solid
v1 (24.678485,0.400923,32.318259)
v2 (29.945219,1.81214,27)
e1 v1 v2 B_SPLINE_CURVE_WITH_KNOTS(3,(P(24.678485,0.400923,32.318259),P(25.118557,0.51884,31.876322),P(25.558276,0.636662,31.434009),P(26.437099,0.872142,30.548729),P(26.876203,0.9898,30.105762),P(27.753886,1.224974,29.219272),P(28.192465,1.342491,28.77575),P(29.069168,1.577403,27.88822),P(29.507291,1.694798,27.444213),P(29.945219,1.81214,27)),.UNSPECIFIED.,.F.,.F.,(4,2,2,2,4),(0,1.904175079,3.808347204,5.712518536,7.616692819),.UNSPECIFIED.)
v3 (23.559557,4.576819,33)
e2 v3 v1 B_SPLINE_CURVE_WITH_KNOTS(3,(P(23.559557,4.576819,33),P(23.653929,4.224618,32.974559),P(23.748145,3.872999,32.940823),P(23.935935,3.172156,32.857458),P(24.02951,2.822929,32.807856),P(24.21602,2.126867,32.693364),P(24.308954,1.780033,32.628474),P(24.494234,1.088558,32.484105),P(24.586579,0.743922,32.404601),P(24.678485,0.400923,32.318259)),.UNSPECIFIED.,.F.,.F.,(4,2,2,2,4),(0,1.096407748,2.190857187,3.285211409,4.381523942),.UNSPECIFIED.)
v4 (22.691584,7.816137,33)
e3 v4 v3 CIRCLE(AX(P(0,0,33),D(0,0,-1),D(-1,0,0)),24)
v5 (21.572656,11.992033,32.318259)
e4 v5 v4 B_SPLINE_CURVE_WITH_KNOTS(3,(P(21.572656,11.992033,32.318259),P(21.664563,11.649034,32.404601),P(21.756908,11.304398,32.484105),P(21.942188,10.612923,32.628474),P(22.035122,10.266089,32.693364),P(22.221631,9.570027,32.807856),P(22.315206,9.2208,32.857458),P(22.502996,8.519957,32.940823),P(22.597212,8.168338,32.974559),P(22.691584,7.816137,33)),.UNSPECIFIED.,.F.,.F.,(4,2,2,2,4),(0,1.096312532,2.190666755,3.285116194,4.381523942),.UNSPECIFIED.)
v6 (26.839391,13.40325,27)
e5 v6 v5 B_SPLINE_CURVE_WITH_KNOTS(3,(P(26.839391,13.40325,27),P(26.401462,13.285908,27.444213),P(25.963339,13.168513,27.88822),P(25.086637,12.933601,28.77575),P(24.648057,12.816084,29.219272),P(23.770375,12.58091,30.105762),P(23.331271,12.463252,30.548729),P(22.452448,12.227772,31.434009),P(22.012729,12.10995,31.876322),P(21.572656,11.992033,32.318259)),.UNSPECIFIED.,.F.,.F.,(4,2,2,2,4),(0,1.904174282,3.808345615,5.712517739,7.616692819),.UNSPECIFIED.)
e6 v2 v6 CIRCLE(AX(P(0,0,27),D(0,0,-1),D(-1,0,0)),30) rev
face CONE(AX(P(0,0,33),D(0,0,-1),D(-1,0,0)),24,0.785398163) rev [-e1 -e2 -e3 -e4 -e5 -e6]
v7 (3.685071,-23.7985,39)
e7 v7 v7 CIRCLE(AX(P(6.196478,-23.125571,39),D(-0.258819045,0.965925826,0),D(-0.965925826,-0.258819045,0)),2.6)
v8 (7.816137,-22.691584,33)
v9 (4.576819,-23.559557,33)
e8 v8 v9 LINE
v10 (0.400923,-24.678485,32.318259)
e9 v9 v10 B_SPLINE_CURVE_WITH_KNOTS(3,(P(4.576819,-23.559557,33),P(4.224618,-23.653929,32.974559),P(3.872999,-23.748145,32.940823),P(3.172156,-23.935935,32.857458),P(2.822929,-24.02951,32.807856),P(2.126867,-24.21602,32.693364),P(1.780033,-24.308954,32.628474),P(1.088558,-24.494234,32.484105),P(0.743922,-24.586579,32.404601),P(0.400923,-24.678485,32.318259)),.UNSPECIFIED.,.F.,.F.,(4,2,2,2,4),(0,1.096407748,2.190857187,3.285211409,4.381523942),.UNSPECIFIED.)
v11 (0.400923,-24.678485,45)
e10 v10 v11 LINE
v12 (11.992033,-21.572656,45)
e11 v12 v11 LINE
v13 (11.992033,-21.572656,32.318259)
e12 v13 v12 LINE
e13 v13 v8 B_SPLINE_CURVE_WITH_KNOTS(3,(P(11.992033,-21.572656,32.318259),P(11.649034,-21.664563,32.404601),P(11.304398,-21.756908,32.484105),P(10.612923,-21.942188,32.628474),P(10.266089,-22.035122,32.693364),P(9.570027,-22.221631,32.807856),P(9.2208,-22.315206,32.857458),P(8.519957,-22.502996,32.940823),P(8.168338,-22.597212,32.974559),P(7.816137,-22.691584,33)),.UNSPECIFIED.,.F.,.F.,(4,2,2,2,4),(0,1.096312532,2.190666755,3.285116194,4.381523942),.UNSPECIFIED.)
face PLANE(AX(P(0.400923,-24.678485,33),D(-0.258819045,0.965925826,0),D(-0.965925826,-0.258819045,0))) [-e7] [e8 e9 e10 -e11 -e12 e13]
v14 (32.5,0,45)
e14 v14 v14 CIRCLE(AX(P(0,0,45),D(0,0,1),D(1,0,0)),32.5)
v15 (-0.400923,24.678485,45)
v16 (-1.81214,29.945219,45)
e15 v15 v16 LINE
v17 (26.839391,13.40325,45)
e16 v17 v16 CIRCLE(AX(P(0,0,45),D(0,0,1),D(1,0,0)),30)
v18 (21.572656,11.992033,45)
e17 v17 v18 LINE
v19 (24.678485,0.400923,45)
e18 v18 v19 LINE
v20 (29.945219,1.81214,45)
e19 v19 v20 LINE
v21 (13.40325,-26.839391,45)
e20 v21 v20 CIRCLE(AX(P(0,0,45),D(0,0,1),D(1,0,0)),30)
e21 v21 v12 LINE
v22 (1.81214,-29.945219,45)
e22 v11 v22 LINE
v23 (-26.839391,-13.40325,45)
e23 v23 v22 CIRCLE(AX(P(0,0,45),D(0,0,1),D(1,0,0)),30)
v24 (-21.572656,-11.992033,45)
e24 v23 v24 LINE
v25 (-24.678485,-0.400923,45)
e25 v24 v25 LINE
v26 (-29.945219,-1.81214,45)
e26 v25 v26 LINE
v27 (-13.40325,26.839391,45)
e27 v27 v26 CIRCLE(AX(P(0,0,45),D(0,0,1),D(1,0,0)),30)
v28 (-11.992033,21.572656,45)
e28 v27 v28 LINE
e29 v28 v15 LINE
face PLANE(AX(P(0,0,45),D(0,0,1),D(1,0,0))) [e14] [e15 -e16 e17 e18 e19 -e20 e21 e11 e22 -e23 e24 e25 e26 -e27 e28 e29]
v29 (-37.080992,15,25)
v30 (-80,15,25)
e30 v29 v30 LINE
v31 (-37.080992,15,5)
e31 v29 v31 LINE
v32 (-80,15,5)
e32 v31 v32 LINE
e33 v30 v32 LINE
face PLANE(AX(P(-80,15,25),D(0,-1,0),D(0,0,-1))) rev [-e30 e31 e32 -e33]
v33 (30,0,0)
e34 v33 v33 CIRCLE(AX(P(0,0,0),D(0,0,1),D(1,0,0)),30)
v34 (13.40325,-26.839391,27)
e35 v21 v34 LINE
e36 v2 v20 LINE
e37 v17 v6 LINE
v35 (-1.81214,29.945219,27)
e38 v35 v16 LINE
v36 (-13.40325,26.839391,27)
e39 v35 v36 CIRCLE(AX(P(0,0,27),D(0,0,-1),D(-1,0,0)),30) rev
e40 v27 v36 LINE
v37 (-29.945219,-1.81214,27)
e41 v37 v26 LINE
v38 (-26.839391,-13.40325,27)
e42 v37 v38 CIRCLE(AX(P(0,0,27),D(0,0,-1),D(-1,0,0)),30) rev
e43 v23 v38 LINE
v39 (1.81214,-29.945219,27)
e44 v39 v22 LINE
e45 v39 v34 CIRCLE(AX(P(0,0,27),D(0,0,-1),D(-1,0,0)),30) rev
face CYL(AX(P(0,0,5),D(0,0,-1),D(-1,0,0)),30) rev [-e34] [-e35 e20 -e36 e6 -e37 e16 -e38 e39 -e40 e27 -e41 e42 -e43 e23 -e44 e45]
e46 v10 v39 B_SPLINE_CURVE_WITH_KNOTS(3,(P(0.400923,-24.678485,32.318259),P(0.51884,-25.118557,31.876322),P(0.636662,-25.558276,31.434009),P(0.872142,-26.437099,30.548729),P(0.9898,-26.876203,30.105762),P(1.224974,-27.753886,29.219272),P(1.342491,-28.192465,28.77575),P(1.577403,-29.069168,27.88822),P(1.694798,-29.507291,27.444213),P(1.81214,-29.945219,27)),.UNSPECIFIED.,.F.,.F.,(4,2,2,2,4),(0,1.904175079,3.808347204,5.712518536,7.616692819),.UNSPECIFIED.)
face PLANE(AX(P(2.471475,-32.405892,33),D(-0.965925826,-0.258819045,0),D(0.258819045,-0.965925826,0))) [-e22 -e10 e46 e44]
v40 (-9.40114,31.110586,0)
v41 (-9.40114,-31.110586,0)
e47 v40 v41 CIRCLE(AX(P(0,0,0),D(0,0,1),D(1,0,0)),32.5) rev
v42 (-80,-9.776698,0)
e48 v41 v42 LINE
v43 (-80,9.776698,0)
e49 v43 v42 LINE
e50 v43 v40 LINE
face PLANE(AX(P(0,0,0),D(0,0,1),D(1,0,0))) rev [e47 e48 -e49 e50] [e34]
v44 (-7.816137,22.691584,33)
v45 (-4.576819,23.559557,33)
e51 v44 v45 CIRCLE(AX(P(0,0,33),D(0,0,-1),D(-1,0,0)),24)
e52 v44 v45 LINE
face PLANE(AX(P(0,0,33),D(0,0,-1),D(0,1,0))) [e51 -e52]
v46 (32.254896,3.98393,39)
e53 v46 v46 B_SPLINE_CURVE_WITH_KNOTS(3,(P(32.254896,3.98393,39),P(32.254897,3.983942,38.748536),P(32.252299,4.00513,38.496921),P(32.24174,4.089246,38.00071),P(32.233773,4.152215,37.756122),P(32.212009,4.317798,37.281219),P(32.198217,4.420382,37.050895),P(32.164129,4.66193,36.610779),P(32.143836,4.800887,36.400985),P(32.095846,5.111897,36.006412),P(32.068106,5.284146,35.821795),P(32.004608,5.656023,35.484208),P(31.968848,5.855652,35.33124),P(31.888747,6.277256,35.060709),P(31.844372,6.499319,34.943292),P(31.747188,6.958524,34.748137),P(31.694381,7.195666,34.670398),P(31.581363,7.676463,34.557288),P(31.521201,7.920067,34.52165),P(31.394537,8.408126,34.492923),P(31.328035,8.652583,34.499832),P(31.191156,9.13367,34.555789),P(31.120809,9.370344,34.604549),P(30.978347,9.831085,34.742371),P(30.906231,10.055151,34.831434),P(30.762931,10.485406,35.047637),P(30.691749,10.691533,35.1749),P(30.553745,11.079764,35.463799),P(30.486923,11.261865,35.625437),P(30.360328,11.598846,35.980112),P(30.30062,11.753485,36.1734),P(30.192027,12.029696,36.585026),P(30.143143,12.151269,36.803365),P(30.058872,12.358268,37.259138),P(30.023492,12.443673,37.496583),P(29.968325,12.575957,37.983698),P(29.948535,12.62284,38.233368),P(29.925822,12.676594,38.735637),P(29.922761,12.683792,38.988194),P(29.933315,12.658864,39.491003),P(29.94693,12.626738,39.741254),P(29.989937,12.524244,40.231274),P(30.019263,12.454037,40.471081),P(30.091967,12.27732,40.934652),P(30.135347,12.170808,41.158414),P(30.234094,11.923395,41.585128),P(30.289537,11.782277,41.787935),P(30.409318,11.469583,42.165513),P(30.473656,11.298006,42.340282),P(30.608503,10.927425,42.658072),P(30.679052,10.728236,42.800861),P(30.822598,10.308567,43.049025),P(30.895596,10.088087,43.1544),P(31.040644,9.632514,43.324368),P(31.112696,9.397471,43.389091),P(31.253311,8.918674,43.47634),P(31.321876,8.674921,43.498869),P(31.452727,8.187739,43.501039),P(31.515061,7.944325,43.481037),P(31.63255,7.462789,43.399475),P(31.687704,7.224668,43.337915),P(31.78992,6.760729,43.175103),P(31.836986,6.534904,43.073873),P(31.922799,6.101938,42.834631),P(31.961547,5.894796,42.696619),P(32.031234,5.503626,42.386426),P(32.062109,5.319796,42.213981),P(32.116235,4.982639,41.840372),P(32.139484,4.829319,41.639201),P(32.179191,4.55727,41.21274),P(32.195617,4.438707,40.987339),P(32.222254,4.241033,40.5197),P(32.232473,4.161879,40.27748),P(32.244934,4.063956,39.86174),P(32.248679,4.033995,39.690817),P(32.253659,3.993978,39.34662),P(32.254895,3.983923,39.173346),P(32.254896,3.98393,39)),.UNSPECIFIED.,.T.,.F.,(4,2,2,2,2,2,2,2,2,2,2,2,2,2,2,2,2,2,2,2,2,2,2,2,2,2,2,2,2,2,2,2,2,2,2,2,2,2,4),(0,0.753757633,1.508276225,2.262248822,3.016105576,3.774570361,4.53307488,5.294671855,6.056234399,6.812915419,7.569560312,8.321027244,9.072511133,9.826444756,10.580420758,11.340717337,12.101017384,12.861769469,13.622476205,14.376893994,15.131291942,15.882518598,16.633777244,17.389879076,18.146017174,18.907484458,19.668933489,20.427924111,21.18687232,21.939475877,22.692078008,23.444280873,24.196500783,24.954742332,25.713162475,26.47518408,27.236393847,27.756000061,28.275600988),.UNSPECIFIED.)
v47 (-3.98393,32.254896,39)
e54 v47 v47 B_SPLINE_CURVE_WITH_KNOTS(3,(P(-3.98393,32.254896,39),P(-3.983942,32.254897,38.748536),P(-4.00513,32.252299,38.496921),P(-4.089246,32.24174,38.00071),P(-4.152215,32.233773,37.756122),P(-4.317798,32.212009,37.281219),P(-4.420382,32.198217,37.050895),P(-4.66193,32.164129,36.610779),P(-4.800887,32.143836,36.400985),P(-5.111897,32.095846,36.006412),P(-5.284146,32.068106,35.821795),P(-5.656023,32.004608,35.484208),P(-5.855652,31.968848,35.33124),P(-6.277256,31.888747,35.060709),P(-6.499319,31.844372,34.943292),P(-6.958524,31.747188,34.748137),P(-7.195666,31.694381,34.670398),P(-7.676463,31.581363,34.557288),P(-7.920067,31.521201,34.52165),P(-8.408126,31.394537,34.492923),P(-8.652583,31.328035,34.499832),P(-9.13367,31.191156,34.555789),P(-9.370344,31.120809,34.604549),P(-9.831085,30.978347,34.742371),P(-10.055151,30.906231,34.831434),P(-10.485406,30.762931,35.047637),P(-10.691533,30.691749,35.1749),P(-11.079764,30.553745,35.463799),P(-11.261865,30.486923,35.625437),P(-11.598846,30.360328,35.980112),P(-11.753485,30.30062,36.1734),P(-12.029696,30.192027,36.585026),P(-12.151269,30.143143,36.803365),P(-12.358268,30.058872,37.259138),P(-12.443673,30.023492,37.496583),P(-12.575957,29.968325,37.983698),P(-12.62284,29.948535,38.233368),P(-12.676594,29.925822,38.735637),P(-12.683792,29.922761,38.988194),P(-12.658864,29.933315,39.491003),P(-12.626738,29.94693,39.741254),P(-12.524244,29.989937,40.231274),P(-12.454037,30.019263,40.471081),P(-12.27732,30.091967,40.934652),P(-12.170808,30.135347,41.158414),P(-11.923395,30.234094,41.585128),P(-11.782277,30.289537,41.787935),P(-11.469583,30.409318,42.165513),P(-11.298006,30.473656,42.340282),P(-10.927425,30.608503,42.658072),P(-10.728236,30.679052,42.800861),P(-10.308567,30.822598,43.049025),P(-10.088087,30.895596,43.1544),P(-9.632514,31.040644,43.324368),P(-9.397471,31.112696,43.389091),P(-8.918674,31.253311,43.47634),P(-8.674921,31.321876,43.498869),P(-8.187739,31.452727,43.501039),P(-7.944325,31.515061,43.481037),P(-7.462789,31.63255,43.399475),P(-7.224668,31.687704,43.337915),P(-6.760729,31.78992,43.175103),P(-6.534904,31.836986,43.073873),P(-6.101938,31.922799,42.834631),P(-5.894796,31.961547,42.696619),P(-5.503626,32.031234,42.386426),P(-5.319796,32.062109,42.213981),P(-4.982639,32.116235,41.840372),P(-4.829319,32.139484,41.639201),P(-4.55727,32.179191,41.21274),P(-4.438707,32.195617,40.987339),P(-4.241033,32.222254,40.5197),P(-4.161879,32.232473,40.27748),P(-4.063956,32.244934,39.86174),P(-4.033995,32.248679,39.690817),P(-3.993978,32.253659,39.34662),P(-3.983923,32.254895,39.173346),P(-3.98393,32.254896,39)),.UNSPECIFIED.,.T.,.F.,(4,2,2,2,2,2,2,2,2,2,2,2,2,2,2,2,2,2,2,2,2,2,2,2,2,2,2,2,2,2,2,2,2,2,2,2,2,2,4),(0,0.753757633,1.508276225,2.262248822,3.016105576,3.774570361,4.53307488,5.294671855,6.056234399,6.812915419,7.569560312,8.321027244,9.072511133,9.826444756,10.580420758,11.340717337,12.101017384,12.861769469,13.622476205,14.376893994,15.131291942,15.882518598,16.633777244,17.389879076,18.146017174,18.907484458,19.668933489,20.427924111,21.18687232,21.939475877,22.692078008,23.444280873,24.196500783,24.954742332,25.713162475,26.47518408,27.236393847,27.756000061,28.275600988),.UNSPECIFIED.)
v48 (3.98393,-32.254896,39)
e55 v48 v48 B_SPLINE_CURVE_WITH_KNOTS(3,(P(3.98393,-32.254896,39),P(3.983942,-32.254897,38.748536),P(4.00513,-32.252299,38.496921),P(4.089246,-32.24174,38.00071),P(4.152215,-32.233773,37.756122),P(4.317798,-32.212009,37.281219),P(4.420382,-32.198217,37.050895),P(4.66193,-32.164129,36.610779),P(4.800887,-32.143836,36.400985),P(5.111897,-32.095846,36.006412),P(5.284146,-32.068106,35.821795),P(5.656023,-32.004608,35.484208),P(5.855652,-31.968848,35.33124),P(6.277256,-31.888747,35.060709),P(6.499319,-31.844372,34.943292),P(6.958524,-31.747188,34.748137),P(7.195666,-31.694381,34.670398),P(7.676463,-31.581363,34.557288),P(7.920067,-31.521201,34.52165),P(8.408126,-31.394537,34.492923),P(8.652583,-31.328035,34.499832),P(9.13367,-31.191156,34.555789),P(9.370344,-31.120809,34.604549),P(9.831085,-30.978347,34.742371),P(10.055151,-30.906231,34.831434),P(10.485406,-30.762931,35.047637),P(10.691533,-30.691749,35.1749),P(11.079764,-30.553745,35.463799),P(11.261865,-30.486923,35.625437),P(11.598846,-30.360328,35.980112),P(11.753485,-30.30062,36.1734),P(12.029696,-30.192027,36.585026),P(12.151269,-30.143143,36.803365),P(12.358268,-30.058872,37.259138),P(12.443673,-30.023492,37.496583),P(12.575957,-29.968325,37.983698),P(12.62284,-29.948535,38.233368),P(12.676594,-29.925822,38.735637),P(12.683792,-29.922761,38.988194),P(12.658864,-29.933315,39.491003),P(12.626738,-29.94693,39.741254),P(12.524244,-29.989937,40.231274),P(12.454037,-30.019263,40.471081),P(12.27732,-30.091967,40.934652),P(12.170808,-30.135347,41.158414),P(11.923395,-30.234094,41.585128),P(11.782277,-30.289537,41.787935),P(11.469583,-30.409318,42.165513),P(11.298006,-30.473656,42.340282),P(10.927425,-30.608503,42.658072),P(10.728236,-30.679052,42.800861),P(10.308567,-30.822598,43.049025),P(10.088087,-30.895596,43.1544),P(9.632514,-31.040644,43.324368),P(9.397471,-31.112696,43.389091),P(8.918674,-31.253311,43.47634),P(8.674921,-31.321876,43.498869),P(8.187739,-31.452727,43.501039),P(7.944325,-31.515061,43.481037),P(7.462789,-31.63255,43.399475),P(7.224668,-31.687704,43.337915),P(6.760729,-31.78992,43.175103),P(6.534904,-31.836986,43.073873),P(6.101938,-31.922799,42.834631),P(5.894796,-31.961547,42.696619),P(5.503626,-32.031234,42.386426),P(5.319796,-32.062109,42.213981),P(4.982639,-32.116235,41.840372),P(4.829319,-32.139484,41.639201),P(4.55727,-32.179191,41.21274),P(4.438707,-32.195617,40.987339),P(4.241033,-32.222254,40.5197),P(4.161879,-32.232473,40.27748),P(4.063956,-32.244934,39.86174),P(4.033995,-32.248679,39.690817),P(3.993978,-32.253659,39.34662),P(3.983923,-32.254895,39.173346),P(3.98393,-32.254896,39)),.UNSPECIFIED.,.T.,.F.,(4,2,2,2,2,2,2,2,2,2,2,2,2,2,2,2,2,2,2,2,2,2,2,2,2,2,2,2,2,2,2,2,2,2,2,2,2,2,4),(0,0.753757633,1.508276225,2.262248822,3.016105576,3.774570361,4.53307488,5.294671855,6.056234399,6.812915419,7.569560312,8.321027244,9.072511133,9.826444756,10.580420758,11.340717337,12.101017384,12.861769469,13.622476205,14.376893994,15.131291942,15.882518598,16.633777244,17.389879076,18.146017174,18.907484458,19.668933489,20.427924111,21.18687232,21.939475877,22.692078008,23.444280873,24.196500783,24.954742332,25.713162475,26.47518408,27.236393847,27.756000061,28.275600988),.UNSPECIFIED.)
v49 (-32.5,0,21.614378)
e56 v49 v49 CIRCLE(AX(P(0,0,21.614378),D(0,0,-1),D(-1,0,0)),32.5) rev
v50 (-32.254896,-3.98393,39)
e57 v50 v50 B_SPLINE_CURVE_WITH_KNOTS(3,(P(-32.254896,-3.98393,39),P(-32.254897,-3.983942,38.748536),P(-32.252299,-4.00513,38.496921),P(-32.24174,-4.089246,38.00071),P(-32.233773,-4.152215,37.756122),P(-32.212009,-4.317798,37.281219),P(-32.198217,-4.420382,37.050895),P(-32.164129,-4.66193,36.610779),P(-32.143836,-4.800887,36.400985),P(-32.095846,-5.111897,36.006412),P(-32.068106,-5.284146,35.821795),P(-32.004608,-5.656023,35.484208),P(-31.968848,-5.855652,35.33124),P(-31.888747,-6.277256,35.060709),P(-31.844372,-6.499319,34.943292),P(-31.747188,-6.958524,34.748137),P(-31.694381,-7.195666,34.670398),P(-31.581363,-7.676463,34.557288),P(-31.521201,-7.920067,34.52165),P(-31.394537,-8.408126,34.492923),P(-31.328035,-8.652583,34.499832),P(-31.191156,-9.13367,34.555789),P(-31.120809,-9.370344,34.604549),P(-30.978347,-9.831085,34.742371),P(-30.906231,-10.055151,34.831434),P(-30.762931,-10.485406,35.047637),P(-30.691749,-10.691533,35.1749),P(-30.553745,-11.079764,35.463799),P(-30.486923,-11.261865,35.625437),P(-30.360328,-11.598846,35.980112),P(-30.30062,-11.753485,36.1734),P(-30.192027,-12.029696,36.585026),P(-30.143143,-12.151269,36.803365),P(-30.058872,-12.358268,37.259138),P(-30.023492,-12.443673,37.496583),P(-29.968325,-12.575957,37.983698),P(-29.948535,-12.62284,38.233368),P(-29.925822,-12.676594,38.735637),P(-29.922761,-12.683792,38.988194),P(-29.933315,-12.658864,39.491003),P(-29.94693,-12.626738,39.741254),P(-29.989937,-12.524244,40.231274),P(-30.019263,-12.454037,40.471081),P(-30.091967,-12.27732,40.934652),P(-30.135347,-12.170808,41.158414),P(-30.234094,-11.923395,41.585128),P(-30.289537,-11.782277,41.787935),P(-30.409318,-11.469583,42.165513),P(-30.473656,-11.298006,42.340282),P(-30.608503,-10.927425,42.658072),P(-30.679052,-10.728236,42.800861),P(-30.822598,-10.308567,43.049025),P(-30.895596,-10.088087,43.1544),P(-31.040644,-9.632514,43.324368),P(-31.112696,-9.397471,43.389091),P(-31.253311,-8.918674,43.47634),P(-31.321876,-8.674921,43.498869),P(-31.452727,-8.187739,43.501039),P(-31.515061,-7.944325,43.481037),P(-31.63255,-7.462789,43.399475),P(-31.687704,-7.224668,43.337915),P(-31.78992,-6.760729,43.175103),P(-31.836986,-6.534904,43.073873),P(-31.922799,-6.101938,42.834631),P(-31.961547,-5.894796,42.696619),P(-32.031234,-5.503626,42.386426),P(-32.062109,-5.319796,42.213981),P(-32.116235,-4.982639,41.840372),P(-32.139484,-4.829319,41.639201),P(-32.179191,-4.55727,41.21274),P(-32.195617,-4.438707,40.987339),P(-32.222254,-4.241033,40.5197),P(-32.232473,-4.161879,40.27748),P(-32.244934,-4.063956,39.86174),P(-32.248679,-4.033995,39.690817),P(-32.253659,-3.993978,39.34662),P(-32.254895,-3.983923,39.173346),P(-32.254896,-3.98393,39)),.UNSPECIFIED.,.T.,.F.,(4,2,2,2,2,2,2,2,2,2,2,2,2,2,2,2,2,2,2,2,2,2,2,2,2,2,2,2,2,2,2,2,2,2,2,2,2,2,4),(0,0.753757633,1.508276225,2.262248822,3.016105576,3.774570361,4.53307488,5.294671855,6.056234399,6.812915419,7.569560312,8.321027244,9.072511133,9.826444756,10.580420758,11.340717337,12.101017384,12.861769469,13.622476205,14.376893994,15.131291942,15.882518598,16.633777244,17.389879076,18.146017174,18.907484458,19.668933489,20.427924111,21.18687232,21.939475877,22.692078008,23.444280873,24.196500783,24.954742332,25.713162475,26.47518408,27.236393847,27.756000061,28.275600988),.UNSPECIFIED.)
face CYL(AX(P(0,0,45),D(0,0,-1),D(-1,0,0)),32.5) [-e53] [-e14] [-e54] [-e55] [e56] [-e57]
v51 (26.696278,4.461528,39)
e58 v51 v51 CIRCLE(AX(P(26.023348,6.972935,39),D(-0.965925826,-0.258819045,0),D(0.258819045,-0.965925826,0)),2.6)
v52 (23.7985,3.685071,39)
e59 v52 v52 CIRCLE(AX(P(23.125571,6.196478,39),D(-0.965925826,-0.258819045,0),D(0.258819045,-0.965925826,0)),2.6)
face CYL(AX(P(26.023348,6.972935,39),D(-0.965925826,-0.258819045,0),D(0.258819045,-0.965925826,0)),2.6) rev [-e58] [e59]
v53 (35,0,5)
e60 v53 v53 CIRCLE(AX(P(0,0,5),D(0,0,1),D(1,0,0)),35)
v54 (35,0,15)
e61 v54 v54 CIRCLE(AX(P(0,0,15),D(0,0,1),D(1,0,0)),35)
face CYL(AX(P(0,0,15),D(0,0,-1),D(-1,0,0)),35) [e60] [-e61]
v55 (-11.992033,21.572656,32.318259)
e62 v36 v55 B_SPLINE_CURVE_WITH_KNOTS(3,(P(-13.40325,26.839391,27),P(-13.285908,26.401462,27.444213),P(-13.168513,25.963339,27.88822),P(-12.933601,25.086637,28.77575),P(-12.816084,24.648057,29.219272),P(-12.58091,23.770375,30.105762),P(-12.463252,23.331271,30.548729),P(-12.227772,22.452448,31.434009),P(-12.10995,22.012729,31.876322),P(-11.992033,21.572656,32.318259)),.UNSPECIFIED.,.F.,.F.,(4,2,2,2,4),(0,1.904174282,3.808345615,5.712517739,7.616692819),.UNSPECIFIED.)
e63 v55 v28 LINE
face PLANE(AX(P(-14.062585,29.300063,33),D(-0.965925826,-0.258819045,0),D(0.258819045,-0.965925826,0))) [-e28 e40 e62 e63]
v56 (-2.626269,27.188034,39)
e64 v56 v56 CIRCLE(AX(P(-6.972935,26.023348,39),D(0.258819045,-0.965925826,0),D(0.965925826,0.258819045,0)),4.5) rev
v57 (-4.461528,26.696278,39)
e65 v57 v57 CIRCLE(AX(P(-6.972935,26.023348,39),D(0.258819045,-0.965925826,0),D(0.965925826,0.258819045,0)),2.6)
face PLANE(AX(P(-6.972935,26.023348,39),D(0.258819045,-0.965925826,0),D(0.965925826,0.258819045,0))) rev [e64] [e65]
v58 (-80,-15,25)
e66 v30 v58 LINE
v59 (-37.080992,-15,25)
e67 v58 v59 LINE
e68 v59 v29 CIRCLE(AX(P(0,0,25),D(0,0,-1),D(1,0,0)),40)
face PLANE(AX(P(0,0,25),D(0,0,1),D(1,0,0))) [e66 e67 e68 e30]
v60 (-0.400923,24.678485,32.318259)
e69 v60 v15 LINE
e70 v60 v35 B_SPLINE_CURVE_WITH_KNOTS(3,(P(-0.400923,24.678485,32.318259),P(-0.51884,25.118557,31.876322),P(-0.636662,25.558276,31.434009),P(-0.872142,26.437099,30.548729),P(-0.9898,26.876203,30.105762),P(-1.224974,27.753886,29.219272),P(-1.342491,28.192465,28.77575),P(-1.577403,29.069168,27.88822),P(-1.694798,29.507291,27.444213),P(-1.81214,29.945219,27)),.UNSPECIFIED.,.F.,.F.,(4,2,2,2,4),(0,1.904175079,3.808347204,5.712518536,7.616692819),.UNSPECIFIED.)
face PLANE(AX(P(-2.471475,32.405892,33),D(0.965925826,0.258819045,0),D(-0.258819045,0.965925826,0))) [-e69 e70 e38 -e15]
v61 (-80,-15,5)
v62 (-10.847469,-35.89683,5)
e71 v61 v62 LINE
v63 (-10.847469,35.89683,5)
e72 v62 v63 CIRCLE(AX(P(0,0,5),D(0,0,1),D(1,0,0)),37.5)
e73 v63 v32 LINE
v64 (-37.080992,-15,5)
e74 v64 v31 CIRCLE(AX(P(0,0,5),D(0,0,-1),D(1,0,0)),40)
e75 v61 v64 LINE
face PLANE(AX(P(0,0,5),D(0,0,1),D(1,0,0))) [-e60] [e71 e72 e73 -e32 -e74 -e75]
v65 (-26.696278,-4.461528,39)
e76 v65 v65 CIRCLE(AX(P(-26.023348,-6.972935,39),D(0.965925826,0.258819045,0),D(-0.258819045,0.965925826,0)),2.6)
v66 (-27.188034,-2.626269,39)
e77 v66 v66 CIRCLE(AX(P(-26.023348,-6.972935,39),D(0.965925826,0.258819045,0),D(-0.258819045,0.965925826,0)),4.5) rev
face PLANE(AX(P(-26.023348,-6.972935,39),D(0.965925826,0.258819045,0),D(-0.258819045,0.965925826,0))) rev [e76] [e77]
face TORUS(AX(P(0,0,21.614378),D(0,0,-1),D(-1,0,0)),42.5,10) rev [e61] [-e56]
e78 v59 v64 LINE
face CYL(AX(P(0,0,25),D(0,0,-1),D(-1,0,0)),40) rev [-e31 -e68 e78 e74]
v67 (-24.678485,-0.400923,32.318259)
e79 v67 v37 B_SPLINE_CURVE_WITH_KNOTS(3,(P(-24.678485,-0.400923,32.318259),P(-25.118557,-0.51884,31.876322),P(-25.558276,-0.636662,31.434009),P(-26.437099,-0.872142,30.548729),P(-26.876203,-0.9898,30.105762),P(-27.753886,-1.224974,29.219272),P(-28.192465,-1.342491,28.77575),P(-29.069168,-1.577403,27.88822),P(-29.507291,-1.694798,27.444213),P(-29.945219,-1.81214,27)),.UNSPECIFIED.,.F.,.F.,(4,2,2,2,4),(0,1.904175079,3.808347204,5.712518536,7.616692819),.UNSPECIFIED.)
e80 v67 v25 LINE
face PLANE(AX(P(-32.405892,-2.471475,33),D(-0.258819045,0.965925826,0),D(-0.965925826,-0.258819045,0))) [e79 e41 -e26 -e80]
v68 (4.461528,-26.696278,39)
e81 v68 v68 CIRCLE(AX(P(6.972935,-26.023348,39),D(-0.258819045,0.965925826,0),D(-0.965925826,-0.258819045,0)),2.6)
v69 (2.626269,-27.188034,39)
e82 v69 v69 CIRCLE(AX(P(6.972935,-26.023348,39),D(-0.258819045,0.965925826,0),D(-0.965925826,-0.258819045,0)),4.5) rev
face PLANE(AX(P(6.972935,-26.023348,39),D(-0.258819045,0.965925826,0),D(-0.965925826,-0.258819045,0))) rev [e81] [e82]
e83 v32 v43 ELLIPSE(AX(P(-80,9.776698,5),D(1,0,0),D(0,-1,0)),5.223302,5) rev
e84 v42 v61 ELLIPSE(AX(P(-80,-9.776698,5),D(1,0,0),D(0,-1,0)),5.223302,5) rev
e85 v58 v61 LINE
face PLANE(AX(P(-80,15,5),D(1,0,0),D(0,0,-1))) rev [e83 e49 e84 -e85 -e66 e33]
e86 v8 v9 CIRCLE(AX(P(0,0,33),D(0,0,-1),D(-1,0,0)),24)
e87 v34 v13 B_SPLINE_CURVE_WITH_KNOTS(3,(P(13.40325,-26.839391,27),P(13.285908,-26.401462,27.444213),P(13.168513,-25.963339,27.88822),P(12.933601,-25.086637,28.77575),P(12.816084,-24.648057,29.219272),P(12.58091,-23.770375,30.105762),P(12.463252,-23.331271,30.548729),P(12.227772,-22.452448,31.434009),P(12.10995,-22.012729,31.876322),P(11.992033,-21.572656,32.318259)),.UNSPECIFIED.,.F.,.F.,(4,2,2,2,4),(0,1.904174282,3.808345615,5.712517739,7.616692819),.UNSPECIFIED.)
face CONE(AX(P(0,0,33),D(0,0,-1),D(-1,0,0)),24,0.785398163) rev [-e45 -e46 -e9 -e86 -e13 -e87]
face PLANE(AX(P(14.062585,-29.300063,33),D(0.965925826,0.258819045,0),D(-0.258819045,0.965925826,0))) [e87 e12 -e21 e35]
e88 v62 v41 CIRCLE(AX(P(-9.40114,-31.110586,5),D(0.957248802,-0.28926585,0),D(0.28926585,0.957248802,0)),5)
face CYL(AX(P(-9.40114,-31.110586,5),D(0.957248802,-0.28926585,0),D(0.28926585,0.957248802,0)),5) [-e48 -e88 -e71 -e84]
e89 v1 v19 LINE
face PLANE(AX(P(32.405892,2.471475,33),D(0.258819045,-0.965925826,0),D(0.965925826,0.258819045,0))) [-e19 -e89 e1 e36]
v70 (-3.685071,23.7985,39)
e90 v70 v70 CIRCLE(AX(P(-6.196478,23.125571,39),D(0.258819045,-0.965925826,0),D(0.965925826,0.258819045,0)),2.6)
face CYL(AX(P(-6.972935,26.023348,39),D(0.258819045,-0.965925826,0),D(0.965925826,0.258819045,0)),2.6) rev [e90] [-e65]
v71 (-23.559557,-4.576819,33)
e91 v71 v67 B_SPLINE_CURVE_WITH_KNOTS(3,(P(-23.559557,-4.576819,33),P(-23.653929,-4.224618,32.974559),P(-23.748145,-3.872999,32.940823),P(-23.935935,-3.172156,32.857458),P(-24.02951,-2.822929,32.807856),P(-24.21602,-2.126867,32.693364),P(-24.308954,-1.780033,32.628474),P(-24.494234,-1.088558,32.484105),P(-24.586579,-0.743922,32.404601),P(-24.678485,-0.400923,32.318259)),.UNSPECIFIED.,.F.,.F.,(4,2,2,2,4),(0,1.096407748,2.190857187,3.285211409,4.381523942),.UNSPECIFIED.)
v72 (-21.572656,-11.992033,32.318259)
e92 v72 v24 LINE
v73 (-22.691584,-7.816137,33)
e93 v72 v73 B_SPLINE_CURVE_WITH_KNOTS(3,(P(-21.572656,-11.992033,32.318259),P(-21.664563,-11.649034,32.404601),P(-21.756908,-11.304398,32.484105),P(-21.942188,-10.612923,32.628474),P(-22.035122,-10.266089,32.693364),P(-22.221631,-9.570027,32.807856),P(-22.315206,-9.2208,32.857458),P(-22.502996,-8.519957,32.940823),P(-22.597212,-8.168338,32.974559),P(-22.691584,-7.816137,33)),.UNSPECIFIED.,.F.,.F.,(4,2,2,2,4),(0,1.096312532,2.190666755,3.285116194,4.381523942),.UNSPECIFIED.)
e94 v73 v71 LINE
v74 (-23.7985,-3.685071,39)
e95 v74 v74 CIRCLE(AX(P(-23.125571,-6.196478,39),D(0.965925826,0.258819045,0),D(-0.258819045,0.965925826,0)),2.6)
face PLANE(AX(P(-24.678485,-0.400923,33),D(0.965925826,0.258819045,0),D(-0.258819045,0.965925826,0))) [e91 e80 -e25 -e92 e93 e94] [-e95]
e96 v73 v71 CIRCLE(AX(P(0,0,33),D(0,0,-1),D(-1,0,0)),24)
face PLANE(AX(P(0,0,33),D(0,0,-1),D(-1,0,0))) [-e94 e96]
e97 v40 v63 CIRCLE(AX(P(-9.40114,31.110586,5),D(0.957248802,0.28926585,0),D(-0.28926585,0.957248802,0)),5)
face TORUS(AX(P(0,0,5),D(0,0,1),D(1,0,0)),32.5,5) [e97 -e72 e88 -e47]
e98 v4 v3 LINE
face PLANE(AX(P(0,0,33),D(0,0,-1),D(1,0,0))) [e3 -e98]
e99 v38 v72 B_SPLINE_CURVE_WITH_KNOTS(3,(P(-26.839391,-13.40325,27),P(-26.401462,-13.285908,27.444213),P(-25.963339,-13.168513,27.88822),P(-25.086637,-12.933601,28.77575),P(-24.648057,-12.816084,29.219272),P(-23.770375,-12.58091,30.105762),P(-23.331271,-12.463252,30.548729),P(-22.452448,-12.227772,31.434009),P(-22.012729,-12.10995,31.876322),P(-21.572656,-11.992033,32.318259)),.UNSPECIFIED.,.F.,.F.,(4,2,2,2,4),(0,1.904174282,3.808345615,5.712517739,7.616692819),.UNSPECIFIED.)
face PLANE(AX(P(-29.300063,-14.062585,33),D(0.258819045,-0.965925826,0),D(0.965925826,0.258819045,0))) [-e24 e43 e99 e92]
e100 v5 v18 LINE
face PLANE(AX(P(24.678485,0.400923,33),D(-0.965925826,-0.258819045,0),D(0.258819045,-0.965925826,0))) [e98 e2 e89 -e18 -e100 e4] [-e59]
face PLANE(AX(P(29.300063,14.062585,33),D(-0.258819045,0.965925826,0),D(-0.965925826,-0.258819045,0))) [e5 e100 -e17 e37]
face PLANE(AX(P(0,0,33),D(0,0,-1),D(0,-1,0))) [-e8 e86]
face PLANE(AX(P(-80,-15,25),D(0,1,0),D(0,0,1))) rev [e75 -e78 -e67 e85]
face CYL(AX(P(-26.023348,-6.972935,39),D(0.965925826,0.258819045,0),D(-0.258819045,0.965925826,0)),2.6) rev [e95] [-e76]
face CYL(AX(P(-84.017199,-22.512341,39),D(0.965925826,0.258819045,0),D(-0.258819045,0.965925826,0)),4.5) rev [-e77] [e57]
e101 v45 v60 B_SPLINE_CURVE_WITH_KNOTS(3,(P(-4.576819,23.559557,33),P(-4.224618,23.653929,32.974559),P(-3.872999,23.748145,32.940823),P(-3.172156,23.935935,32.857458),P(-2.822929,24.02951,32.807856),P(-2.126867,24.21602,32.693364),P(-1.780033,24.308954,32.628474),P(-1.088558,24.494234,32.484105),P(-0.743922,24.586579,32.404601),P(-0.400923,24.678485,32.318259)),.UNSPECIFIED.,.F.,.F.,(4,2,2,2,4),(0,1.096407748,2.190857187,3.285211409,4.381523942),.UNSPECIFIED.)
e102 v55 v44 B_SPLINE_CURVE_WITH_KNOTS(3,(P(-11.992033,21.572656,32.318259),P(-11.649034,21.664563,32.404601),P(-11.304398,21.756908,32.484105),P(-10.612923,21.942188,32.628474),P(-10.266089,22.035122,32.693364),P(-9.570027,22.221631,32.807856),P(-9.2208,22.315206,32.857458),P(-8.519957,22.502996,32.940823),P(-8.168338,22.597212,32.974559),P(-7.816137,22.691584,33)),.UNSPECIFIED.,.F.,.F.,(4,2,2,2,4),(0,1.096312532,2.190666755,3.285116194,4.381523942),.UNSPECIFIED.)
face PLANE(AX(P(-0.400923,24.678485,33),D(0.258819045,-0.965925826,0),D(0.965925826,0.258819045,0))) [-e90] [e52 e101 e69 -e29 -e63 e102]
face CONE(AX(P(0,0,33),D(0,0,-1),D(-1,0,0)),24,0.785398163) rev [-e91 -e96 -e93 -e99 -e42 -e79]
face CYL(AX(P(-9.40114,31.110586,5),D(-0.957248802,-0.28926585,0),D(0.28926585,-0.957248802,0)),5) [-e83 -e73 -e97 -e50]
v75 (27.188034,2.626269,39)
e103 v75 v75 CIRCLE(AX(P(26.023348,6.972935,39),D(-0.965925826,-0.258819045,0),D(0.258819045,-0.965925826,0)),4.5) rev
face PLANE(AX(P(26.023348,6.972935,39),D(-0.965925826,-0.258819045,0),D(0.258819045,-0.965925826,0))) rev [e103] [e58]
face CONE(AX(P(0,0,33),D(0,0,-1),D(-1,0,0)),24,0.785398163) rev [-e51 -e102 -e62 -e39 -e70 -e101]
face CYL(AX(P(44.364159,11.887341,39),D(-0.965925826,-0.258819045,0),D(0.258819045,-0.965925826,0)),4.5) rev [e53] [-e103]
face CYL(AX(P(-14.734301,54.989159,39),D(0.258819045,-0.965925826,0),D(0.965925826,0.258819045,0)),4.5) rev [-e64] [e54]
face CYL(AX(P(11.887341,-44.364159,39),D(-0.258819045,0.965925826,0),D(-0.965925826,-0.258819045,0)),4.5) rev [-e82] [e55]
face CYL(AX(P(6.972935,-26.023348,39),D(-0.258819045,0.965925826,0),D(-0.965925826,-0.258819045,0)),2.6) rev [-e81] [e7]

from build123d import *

# Parameters (mm, degrees)
ESQUISSE1_R                               = 30
BOSS_EXTRU_1_DEPTH                        = 5
ESQUISSE6_R                               = 35
ESQUISSE6_R_2                             = 30
BOSS_EXTRU_6_DEPTH                        = 10
ESQUISSE7_R                               = 32.5
ESQUISSE7_R_2                             = 30
BOSS_EXTRU_8_DEPTH                        = 30
CONG_2_R                                  = 10
BOSS_EXTRU_9_DEPTH                        = 20
BOSS_EXTRU_10_DEPTH                       = 12
CHANFREIN1_SIZE                           = 6
CONG_3_R                                  = 5
ENL_V_MAT_EXTRU_1_REACH                   = 89.234
ENL_V_MAT_EXTRU_1_END_RADIUS              = 32.5
ESQUISSE10_R                              = 4.5
ESQUISSE11_R                              = 4.5
ESQUISSE11_R_2                            = 2.6
BOSS_EXTRU_11_DEPTH                       = 3
R_P_TITION_CIRCULAIRE1_COUNT              = 4
CHANFREIN1_OF_R_P_TITION_CIRCULAIRE1_SIZE = 6


# Some blends are built 0.0001 mm under size
with BuildPart() as part:
    # Esquisse1 → Boss.-Extru.1 (new body)
    with BuildSketch(Plane.XY):
        with BuildLine():
            Line((-10.847469364, 35.896830061), (-80, 15))
            Line((-80, 15), (-80, -15))
            Line((-80, -15), (-10.847469364, -35.896830061))
            ThreePointArc((-10.847469364, -35.896830061), (37.5, 0), (-10.847469364, 35.896830061))
        make_face()
        Circle(ESQUISSE1_R, mode=Mode.SUBTRACT)
    extrude(amount=BOSS_EXTRU_1_DEPTH)

    # Esquisse6 → Boss.-Extru.6 (add)
    with BuildSketch(Plane.XY.offset(5)):
        Circle(ESQUISSE6_R)
        Circle(ESQUISSE6_R_2, mode=Mode.SUBTRACT)
    extrude(amount=BOSS_EXTRU_6_DEPTH)

    # Esquisse7 → Boss.-Extru.8 (add)
    with BuildSketch(Plane.XY.offset(15)):
        Circle(ESQUISSE7_R)
        Circle(ESQUISSE7_R_2, mode=Mode.SUBTRACT)
    extrude(amount=BOSS_EXTRU_8_DEPTH)

    # Congé2
    # the kernel refuses this fillet: 10 mm, written as the material it adds along each edge
    with BuildSketch(Plane(origin=(0, 0, 15), x_dir=(1, 0, 0), z_dir=(0, -1, 0))) as cong_2_piece_1:
        with BuildLine():
            CenterArc((42.5, 6.614378278), CONG_2_R, 180, 41.409622109)
            Line((32.5, 6.614378278), (32.3, 6.614378278))
            Line((32.3, 6.614378278), (32.3, 0))
            Line((32.3, 0), (32.5, -0.2))
            ThreePointArc((32.5, -0.2), (33.75, -0.2), (34.85, -0.132287566))
            Line((34.85, -0.132287566), (35, 0))
        make_face()
    revolve(axis=Axis((0, 0, 15), (0, 0, 1)))

    # Esquisse8 → Boss.-Extru.9 (add)
    with BuildSketch(Plane.XY.offset(5)):
        with BuildLine():
            Line((-80, 15), (-37.080992435, 15))
            ThreePointArc((-37.080992435, 15), (-40, 0), (-37.080992435, -15))
            Line((-37.080992435, -15), (-80, -15))
            Line((-80, -15), (-80, 15))
        make_face()
    extrude(amount=BOSS_EXTRU_9_DEPTH)

    # Esquisse9 → Boss.-Extru.10 (add)
    with BuildSketch(Plane.XY.offset(45)):
        Polygon((-32.405891584, -2.471475398), (-29.300063043, -14.062585313), (-21.572656433, -11.992032952), (-24.678484974, -0.400923037), align=None)
    boss_extru_10 = extrude(amount=-BOSS_EXTRU_10_DEPTH)

    # Chanfrein1
    # the kernel refuses this chamfer: 6 mm, written as the material it adds along each edge
    with BuildSketch(Plane(origin=(0, 0, 33), x_dir=(-0.5590908430517356, -0.8291064040373223, 0), z_dir=(0.8291064040373223, -0.5590908430517356, 0))) as chanfrein1_piece_1_section:
        Polygon((30, CHANFREIN1_SIZE), (30 - CHANFREIN1_SIZE, 0), (30, 0), align=None)
    chanfrein1_piece_1 = revolve(axis=Axis((0, 0, 33), (0, 0, -1)), revolution_arc=82.01410645, mode=Mode.PRIVATE)
    chanfrein1_piece_1 = split(chanfrein1_piece_1, bisect_by=Plane(origin=(-25.327272202, -12.998079215, 31.008979001), z_dir=(-0.25881904510251486, 0.96592582628907, 0)), keep=Keep.TOP, mode=Mode.PRIVATE)
    chanfrein1_piece_1 = split(chanfrein1_piece_1, bisect_by=Plane(origin=(-28.433100743, -1.4069693, 31.008979001), z_dir=(0.2588190451025147, -0.96592582628907, 0)), keep=Keep.TOP, mode=Mode.PRIVATE)
    chanfrein1_piece_1 = split(chanfrein1_piece_1, bisect_by=Plane(origin=(-23.125570703, -6.196477994, 31.008979001), z_dir=(-0.9659258262890699, -0.2588190451025148, 0)), keep=Keep.TOP, mode=Mode.PRIVATE)
    add(chanfrein1_piece_1)

    # Congé3
    cong_3_edges = [part.edges().sort_by_distance(p)[0] for p in [
        (37.5, 0, 0),
        (-45.423734682, 25.44841503, 0),
        (-45.423734682, -25.44841503, 0),
    ]]
    fillet(cong_3_edges, radius=CONG_3_R - 0.0001)  # a hair under: the kernel refuses the full size

    # Enlèv. mat.-Extru.1: up to this cylinder (the profile starts inside it)
    enl_v_mat_extru_1_end = Plane(origin=(0, 0, 39), z_dir=(0, 0, -1)) * Cylinder(ENL_V_MAT_EXTRU_1_END_RADIUS, 244.468, mode=Mode.PRIVATE)
    # Esquisse10 → Enlèv. mat.-Extru.1 (cut, up to the surface)
    with BuildSketch(Plane(origin=(-23.125570703, -6.196477994, 0), x_dir=(0, 0, -1), z_dir=(0.96592582628907, 0.25881904510251497, 0)), mode=Mode.PRIVATE) as enl_v_mat_extru_1_sk1:
        with Locations(Location((-39, 0, 0), (0, 0, 90))):
            Circle(ESQUISSE10_R)
    enl_v_mat_extru_1_tool1 = extrude(enl_v_mat_extru_1_sk1.sketch, amount=-ENL_V_MAT_EXTRU_1_REACH, mode=Mode.PRIVATE) & enl_v_mat_extru_1_end
    enl_v_mat_extru_1 = enl_v_mat_extru_1_tool1.solids().sort_by_distance((-23.125571, -6.196478, 39))[0]
    add(enl_v_mat_extru_1, mode=Mode.SUBTRACT)

    # Esquisse11 → Boss.-Extru.11 (add)
    with BuildSketch(Plane(origin=(-23.125570703, -6.196477994, 0), x_dir=(0, 0, -1), z_dir=(0.96592582628907, 0.25881904510251497, 0))):
        with Locations(Location((-39, 0, 0), (0, 0, 90))):
            Circle(ESQUISSE11_R)
        with Locations(Location((-39, 0, 0), (0, 0, 90))):
            Circle(ESQUISSE11_R_2, mode=Mode.SUBTRACT)
    boss_extru_11 = extrude(amount=-BOSS_EXTRU_11_DEPTH)

    # Répétition circulaire1: Boss.-Extru.10, Enlèv. mat.-Extru.1, Boss.-Extru.11 ×4 about axis
    r_p_tition_circulaire1_axis = Axis((0, 0, 0), (0, 0, 1))
    add([boss_extru_10.rotate(r_p_tition_circulaire1_axis, i * 360 / R_P_TITION_CIRCULAIRE1_COUNT) for i in range(1, R_P_TITION_CIRCULAIRE1_COUNT)])
    add([enl_v_mat_extru_1.rotate(r_p_tition_circulaire1_axis, i * 360 / R_P_TITION_CIRCULAIRE1_COUNT) for i in range(1, R_P_TITION_CIRCULAIRE1_COUNT)], mode=Mode.SUBTRACT)
    add([boss_extru_11.rotate(r_p_tition_circulaire1_axis, i * 360 / R_P_TITION_CIRCULAIRE1_COUNT) for i in range(1, R_P_TITION_CIRCULAIRE1_COUNT)])

    # Chanfrein1 of Répétition circulaire1
    # the kernel refuses this chamfer: 6 mm, written as the material it adds along each edge
    with BuildSketch(Plane(origin=(0, 0, 33), x_dir=(0.8291064040373222, -0.559090843051736, 0), z_dir=(0.559090843051736, 0.8291064040373222, 0))) as chanfrein1_of_r_p_tition_circulaire1_piece_1_section:
        Polygon((30, CHANFREIN1_OF_R_P_TITION_CIRCULAIRE1_SIZE), (30 - CHANFREIN1_OF_R_P_TITION_CIRCULAIRE1_SIZE, 0), (30, 0), align=None)
    chanfrein1_of_r_p_tition_circulaire1_piece_1 = revolve(axis=Axis((0, 0, 33), (0, 0, -1)), revolution_arc=82.01410645, mode=Mode.PRIVATE)
    chanfrein1_of_r_p_tition_circulaire1_piece_1 = split(chanfrein1_of_r_p_tition_circulaire1_piece_1, bisect_by=Plane(origin=(12.998079215, -25.327272202, 31.008979001), z_dir=(-0.96592582628907, -0.25881904510251474, 0)), keep=Keep.TOP, mode=Mode.PRIVATE)
    chanfrein1_of_r_p_tition_circulaire1_piece_1 = split(chanfrein1_of_r_p_tition_circulaire1_piece_1, bisect_by=Plane(origin=(1.4069693, -28.433100743, 31.008979001), z_dir=(0.96592582628907, 0.2588190451025146, 0)), keep=Keep.TOP, mode=Mode.PRIVATE)
    chanfrein1_of_r_p_tition_circulaire1_piece_1 = split(chanfrein1_of_r_p_tition_circulaire1_piece_1, bisect_by=Plane(origin=(6.196477994, -23.125570703, 31.008979001), z_dir=(0.25881904510251474, -0.9659258262890701, 0)), keep=Keep.TOP, mode=Mode.PRIVATE)
    add(chanfrein1_of_r_p_tition_circulaire1_piece_1)
    with BuildSketch(Plane(origin=(0, 0, 33), x_dir=(0.5590908430517355, 0.8291064040373223, 0), z_dir=(-0.8291064040373223, 0.5590908430517355, 0))) as chanfrein1_of_r_p_tition_circulaire1_piece_2_section:
        Polygon((30, CHANFREIN1_OF_R_P_TITION_CIRCULAIRE1_SIZE), (30 - CHANFREIN1_OF_R_P_TITION_CIRCULAIRE1_SIZE, 0), (30, 0), align=None)
    chanfrein1_of_r_p_tition_circulaire1_piece_2 = revolve(axis=Axis((0, 0, 33), (0, 0, -1)), revolution_arc=82.01410645, mode=Mode.PRIVATE)
    chanfrein1_of_r_p_tition_circulaire1_piece_2 = split(chanfrein1_of_r_p_tition_circulaire1_piece_2, bisect_by=Plane(origin=(25.327272202, 12.998079215, 31.008979001), z_dir=(0.25881904510251474, -0.96592582628907, 0)), keep=Keep.TOP, mode=Mode.PRIVATE)
    chanfrein1_of_r_p_tition_circulaire1_piece_2 = split(chanfrein1_of_r_p_tition_circulaire1_piece_2, bisect_by=Plane(origin=(28.433100743, 1.4069693, 31.008979001), z_dir=(-0.2588190451025146, 0.96592582628907, 0)), keep=Keep.TOP, mode=Mode.PRIVATE)
    chanfrein1_of_r_p_tition_circulaire1_piece_2 = split(chanfrein1_of_r_p_tition_circulaire1_piece_2, bisect_by=Plane(origin=(23.125570703, 6.196477994, 31.008979001), z_dir=(0.9659258262890701, 0.25881904510251474, 0)), keep=Keep.TOP, mode=Mode.PRIVATE)
    add(chanfrein1_of_r_p_tition_circulaire1_piece_2)
    with BuildSketch(Plane(origin=(0, 0, 33), x_dir=(-0.8291064040373223, 0.5590908430517356, 0), z_dir=(-0.5590908430517356, -0.8291064040373223, 0))) as chanfrein1_of_r_p_tition_circulaire1_piece_3_section:
        Polygon((30, CHANFREIN1_OF_R_P_TITION_CIRCULAIRE1_SIZE), (30 - CHANFREIN1_OF_R_P_TITION_CIRCULAIRE1_SIZE, 0), (30, 0), align=None)
    chanfrein1_of_r_p_tition_circulaire1_piece_3 = revolve(axis=Axis((0, 0, 33), (0, 0, -1)), revolution_arc=82.01410645, mode=Mode.PRIVATE)
    chanfrein1_of_r_p_tition_circulaire1_piece_3 = split(chanfrein1_of_r_p_tition_circulaire1_piece_3, bisect_by=Plane(origin=(-12.998079215, 25.327272202, 31.008979001), z_dir=(0.9659258262890701, 0.25881904510251463, 0)), keep=Keep.TOP, mode=Mode.PRIVATE)
    chanfrein1_of_r_p_tition_circulaire1_piece_3 = split(chanfrein1_of_r_p_tition_circulaire1_piece_3, bisect_by=Plane(origin=(-1.4069693, 28.433100743, 31.008979001), z_dir=(-0.9659258262890701, -0.25881904510251447, 0)), keep=Keep.TOP, mode=Mode.PRIVATE)
    chanfrein1_of_r_p_tition_circulaire1_piece_3 = split(chanfrein1_of_r_p_tition_circulaire1_piece_3, bisect_by=Plane(origin=(-6.196477994, 23.125570703, 31.008979001), z_dir=(-0.2588190451025146, 0.96592582628907, 0)), keep=Keep.TOP, mode=Mode.PRIVATE)
    add(chanfrein1_of_r_p_tition_circulaire1_piece_3)


solid = part.part
